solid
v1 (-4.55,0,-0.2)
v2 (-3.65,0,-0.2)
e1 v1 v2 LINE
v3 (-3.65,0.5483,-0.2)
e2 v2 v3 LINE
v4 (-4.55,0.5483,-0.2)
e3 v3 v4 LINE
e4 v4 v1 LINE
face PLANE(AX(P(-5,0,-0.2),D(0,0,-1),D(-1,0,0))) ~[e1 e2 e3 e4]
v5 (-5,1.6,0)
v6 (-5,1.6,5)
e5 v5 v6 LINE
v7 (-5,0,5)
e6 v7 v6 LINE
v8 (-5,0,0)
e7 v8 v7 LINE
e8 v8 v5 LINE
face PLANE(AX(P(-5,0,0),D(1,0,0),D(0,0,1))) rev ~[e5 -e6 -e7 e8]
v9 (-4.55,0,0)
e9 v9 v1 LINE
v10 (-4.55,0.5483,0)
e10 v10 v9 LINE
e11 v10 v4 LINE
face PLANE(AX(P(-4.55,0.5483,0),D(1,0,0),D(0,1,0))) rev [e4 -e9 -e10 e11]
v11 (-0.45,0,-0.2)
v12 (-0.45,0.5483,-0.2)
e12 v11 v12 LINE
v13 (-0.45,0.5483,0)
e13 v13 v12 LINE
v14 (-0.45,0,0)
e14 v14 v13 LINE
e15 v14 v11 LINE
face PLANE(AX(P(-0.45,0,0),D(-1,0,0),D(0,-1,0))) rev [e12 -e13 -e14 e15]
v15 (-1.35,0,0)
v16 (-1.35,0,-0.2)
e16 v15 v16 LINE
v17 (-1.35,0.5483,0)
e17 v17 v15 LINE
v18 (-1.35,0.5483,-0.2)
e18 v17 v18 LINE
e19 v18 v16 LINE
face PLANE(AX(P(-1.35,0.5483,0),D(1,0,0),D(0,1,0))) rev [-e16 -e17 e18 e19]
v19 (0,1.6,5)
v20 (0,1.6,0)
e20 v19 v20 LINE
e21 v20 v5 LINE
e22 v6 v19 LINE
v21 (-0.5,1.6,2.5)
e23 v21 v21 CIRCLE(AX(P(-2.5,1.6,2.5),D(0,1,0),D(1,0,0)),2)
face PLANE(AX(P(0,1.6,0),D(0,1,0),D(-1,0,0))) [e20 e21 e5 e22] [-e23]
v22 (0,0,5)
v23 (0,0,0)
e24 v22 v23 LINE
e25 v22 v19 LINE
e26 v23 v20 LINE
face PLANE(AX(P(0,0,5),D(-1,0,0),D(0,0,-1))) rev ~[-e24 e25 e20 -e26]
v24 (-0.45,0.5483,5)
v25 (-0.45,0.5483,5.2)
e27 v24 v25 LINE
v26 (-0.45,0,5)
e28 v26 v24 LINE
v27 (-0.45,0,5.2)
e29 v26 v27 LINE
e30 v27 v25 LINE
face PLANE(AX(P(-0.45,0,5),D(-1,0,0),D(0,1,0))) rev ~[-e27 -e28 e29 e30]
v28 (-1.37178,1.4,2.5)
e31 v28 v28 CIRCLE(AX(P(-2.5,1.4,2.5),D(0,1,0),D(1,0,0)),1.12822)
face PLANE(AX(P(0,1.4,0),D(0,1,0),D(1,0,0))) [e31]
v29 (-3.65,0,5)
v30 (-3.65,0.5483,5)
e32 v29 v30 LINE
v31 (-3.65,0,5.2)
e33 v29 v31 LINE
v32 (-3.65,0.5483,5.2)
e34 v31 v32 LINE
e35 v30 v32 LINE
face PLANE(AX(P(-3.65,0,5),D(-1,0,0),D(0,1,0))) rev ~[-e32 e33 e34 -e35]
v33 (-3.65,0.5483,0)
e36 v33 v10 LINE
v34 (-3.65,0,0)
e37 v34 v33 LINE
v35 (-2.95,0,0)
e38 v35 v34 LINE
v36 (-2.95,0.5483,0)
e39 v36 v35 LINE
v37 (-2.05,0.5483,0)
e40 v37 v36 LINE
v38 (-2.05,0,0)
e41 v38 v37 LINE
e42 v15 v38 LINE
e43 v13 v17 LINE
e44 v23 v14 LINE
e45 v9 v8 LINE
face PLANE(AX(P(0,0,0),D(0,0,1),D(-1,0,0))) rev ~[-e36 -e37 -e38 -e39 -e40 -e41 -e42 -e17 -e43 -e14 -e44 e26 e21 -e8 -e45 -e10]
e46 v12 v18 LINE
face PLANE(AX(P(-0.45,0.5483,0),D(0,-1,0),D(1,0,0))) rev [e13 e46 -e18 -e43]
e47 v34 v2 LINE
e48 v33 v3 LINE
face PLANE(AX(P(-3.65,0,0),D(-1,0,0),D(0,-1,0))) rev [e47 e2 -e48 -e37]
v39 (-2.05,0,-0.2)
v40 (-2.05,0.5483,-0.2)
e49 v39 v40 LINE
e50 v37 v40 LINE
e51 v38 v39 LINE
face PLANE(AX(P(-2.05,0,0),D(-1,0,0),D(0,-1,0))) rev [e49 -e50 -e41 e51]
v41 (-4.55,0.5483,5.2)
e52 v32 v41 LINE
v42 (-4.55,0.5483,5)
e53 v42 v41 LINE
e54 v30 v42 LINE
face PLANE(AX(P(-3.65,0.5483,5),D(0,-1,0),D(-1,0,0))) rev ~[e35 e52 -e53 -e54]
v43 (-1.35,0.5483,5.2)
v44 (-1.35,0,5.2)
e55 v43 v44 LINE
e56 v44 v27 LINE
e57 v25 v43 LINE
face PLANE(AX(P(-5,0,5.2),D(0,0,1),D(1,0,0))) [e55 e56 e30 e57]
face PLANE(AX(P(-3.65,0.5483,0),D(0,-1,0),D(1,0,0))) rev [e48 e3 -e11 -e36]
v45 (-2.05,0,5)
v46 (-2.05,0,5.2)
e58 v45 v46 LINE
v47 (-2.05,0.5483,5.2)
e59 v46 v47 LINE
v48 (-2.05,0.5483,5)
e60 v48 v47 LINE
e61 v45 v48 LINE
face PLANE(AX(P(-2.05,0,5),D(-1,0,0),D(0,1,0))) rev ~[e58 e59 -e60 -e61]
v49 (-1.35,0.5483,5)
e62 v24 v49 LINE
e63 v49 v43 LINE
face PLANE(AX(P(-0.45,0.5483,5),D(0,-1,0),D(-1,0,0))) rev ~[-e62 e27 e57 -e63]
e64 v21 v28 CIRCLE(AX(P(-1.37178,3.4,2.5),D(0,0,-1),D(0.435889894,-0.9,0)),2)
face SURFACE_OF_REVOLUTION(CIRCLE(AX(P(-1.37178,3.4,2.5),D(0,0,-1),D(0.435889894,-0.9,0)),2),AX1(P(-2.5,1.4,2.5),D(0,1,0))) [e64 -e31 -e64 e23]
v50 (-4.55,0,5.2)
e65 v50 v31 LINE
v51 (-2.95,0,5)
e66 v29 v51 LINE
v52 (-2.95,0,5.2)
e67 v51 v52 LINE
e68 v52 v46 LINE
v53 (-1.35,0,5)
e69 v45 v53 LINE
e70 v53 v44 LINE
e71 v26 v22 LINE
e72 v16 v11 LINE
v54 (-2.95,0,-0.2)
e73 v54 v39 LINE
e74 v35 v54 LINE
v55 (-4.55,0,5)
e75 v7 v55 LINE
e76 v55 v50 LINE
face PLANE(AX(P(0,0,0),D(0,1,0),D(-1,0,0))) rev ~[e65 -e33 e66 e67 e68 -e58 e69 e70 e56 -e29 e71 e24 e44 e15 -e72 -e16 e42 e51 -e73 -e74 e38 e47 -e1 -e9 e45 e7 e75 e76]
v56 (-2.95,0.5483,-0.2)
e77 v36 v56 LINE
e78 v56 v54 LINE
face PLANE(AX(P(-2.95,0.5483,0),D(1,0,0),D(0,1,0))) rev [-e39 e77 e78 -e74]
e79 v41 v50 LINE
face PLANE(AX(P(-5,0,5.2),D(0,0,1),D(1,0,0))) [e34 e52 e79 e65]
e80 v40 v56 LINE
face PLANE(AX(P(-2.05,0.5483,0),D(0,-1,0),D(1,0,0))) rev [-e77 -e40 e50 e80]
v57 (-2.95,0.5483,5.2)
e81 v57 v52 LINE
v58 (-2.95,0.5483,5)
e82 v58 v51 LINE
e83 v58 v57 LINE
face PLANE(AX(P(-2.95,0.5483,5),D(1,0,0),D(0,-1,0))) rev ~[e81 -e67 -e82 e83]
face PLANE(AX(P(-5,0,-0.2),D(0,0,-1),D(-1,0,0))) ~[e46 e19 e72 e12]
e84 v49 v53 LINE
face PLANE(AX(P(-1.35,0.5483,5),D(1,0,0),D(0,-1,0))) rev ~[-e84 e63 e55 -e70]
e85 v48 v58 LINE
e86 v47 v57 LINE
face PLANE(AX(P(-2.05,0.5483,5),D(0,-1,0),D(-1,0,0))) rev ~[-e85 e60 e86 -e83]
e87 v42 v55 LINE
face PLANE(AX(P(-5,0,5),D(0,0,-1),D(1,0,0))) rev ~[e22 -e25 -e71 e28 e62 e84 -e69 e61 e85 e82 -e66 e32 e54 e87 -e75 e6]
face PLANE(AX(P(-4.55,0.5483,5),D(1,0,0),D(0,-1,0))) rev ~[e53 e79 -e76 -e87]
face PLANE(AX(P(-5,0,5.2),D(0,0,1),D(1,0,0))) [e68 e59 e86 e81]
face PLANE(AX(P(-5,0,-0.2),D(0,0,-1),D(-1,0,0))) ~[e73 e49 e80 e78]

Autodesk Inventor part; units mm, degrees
ref_plane "YZ Plane" through (0, 0, 0) normal (1, 0, 0) x (0, 1, 0)
ref_plane "XZ Plane" through (0, 0, 0) normal (0, 1, 0) x (-1, 0, 0)
ref_plane "XY Plane" through (0, 0, 0) normal (0, 0, 1) x (1, 0, 0)
sketch "Skizze1" plane through (0, 0, 0) normal (0, 1, 0) x (-1, 0, 0)
  line L0 (0, 0) -> (5, 0)
  line L1 (5, 0) -> (5, 5)
  line L2 (5, 5) -> (0, 5)
  line L3 (0, 5) -> (0, 0)
  dimension "d0" = 5
  dimension "d1" = 5
extrude "Extrusion1" add sketch "Skizze1" along normal blind 1.6
ref_plane "Arbeitsebene1" through (0, 1.6, 2.5) normal (0, 0, -1) x (-1, 0, 0)
sketch "Skizze2" plane through (-5, 0, 5) normal (0, 0, 1) x (1, 0, 0)
  line L0 (0, 0) -> (5, 0) projected
  line L1 (5, 0) -> (5, 1.6) projected
  line L2 (0, 0) -> (0, 1.6) projected
  line L3 (0.45, 0) -> (1.35, 0)
  line L4 (1.35, 0) -> (1.35, 0.5483)
  line L5 (1.35, 0.5483) -> (0.45, 0.5483)
  line L6 (0.45, 0.5483) -> (0.45, 0)
  line L7 (2.05, 0) -> (2.95, 0)
  line L8 (2.95, 0) -> (2.95, 0.5483)
  line L9 (2.95, 0.5483) -> (2.05, 0.5483)
  line L10 (2.05, 0.5483) -> (2.05, 0)
  line L11 (3.65, 0) -> (4.55, 0)
  line L12 (4.55, 0) -> (4.55, 0.5483)
  line L13 (4.55, 0.5483) -> (3.65, 0.5483)
  line L14 (3.65, 0.5483) -> (3.65, 0)
  line L15 (0.45, 0.5483) -> (0, 0.5483)
  line L16 (4.55, 0.5483) -> (5, 0.5483)
  dimension "d4" = 0.9
  dimension "d5" = 0.9
  dimension "d6" = 0.9
  dimension "d7" = 0.7
  dimension "d8" = 0.7
extrude "Extrusion2" add sketch "Skizze2" along normal blind 0.2 contours L6 L5 L4 L0 | L10 L9 L8 L0 | L14 L13 L12 L0
mirror "Spiegeln1" about plane through (0, 1.6, 2.5) normal (0, 0, -1) of "Extrusion2"
sketch "Skizze3" plane through (0, 1.6, 0) normal (0, 1, 0) x (1, 0, 0)
  circle A0 centre (-2.5, -2.5) radius 2
  dimension "d11" = 4
extrude "Extrusion3" cut sketch "Skizze3" against normal blind 0.2
fillet "Rundung1" radius 2 1 edges at (-4.5, 1.4, 2.5)
properties part number "5050_LED"
